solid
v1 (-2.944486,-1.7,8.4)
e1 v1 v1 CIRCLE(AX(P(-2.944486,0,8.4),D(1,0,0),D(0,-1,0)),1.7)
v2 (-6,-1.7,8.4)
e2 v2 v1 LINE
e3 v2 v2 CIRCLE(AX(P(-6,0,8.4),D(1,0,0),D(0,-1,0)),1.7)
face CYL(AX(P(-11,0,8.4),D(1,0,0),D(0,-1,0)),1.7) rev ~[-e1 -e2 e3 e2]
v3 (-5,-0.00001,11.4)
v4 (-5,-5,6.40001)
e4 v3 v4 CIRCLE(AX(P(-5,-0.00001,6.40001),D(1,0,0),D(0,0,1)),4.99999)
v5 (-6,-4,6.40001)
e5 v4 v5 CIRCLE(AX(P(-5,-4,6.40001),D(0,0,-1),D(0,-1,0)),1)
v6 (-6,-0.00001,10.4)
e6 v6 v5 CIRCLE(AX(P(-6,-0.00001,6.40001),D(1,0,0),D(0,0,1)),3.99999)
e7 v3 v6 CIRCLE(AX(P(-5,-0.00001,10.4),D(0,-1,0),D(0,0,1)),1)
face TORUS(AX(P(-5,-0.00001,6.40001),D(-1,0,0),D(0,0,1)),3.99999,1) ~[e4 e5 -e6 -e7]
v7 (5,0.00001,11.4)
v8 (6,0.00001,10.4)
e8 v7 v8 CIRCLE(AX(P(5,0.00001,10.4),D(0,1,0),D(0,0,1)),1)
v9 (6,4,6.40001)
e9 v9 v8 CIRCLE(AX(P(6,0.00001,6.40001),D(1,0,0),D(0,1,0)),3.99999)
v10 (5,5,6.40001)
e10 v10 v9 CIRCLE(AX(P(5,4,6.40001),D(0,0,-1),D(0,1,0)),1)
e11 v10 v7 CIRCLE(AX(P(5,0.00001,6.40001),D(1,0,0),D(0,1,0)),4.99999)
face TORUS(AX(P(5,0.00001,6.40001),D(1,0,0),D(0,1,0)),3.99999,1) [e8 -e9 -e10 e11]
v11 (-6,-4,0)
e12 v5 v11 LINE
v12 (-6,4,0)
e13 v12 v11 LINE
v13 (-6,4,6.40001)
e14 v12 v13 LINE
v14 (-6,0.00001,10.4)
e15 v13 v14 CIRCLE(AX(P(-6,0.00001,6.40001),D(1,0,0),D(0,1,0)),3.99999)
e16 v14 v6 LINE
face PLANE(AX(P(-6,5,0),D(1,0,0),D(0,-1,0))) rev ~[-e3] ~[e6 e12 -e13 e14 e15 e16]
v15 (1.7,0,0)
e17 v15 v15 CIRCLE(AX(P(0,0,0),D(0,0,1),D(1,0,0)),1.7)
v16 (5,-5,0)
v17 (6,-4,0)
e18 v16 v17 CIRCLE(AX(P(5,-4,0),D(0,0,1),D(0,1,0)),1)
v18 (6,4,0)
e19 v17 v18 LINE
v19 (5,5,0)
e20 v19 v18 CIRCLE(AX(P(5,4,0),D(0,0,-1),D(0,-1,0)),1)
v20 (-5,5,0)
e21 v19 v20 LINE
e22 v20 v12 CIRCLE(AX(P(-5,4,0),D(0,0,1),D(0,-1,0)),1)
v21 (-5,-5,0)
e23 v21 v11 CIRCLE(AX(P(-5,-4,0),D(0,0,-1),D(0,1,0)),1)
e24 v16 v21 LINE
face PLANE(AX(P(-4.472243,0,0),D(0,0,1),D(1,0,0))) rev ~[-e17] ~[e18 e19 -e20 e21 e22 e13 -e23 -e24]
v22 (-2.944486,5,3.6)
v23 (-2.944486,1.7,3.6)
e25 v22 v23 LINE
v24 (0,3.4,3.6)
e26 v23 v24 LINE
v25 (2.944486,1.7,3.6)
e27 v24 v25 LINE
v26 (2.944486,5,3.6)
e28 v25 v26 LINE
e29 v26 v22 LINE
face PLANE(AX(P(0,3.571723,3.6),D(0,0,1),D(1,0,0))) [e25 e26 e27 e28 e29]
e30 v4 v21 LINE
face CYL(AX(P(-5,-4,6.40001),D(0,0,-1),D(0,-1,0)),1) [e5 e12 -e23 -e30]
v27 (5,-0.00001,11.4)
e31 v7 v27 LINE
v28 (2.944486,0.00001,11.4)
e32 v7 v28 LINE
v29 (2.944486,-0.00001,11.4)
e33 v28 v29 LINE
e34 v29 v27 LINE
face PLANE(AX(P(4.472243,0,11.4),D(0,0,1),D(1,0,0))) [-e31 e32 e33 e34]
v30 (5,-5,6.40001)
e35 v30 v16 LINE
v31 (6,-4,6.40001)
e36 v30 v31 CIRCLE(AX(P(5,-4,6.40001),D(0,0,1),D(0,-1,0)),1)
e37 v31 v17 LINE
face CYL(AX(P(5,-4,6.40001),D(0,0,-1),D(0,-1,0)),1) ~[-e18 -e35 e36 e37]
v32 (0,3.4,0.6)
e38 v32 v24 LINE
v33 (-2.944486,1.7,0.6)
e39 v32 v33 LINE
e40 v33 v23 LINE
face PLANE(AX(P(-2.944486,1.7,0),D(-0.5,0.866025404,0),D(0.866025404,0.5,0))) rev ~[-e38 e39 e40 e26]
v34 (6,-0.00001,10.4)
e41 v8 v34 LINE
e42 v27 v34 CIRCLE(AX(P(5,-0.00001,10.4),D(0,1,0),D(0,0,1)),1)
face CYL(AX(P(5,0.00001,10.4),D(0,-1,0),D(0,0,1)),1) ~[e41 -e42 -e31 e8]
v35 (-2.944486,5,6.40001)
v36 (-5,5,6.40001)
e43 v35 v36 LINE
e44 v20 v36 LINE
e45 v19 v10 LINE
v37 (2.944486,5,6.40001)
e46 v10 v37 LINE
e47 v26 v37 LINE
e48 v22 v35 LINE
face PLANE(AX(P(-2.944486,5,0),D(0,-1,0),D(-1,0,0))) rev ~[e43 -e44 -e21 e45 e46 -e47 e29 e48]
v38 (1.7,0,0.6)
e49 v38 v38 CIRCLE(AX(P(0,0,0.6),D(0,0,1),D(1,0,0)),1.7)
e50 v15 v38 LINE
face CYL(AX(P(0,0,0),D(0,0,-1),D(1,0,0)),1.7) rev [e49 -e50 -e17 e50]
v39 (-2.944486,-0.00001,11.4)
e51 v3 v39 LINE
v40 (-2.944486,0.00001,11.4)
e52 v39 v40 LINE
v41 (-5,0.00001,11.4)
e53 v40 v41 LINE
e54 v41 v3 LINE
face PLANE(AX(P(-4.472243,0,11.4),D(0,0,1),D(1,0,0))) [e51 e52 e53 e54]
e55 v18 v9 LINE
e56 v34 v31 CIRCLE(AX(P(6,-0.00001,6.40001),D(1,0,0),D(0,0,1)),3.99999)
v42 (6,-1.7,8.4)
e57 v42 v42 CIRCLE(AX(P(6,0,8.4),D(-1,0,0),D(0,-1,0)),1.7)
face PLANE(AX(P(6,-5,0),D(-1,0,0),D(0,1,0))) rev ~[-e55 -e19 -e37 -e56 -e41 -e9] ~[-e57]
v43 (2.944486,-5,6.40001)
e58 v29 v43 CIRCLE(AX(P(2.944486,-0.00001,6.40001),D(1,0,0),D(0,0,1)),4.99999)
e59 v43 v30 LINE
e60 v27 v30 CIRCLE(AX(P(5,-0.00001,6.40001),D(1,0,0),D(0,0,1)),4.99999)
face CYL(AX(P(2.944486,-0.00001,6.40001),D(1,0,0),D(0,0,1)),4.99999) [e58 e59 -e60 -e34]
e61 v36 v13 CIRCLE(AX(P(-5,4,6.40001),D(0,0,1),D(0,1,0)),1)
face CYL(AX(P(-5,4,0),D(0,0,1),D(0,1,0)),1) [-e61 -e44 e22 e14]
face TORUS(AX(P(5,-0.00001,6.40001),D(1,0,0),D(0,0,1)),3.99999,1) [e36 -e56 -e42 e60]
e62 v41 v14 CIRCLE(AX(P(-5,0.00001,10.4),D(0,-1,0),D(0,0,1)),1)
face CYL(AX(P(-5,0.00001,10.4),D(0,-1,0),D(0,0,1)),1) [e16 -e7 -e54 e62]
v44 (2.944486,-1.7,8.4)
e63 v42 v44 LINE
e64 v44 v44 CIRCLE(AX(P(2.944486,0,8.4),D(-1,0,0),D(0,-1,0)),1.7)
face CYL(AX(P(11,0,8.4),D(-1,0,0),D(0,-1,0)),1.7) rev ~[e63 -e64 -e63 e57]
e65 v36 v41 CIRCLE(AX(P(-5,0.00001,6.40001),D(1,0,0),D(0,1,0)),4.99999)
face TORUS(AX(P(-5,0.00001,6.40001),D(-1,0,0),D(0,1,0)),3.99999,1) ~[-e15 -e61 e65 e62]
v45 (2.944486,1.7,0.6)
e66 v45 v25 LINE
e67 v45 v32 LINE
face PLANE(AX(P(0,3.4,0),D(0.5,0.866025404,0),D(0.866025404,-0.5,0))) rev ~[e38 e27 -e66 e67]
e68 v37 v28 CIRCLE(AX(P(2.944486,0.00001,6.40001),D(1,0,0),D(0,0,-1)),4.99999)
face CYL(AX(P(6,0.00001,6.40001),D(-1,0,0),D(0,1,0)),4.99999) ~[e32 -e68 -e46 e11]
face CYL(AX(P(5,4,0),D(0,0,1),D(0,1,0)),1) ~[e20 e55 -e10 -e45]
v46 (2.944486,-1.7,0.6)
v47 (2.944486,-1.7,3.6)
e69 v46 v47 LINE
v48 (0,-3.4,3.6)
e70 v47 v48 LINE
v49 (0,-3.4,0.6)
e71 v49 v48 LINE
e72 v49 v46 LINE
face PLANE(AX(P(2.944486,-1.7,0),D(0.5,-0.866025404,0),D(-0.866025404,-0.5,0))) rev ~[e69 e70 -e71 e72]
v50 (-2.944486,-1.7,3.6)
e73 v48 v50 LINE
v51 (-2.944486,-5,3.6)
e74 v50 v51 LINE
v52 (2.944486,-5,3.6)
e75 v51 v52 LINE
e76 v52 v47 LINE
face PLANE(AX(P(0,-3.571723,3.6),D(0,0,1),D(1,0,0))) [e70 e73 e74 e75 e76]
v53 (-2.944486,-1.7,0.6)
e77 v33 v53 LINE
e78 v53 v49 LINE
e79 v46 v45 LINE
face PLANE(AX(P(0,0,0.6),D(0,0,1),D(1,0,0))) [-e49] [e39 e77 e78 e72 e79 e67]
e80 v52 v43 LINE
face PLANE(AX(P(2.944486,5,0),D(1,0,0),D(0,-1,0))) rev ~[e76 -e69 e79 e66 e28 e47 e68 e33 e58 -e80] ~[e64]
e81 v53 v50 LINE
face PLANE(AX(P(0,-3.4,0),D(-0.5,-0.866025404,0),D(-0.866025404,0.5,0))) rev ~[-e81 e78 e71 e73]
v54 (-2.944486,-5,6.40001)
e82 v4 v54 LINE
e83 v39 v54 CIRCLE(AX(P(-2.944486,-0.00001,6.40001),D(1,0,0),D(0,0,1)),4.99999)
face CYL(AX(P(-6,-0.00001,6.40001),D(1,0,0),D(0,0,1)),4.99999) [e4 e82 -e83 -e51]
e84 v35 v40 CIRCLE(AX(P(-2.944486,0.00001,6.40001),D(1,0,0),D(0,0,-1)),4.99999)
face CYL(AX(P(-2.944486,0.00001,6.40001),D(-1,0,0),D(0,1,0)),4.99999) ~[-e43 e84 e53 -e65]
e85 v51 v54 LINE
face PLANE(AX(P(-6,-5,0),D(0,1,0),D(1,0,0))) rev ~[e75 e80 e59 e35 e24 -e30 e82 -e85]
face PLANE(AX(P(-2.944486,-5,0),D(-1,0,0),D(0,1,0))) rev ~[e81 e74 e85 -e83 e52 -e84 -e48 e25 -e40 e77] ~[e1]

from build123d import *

# Parameters (mm, degrees)
F0_R     = 1.7
F5_DEPTH = 0.6
F6_DEPTH = 3.6
F7_DEPTH = 11.4
F8_D     = 3.4
F8_DEPTH = 5
F8_START = 1
F8_TIP   = 1.0214630523
F9_D     = 3.4
F9_DEPTH = 5
F9_START = 1
F9_TIP   = 1.0214630523
F10_R    = 4.99999
F11_R    = 1


# Not quite as in the source:
# - a fillet or chamfer is up to 0.001 mm smaller than in the source, because OpenCascade refuses the exact size


with BuildPart() as f5:
    # F0 (on Top) → F5 (new body)
    with BuildSketch(Plane.XY):
        Polygon((0, 3.4), (-2.9444863729, 1.7), (-2.9444863729, -1.7), (0, -3.4), (2.9444863729, -1.7), (2.9444863729, 1.7), align=None)
        Circle(F0_R, mode=Mode.SUBTRACT)
    extrude(amount=F5_DEPTH)

    # F0 (on Top) → F6 (join)
    with BuildSketch(Plane.XY):
        Polygon((2.9444863729, 5), (-2.9444863729, 5), (-2.9444863729, 1.7), (0, 3.4), (2.9444863729, 1.7), align=None)
        Polygon((-2.9444863729, -1.7), (-2.9444863729, -5), (2.9444863729, -5), (2.9444863729, -1.7), (0, -3.4), align=None)
    extrude(amount=F6_DEPTH)

    # F0 (on Top) → F7 (join)
    with BuildSketch(Plane.XY):
        Polygon((-2.9444863729, 5), (-6, 5), (-6, -5), (-2.9444863729, -5), (-2.9444863729, -1.7), (-2.9444863729, 1.7), align=None)
        Polygon((6, 5), (2.9444863729, 5), (2.9444863729, 1.7), (2.9444863729, -1.7), (2.9444863729, -5), (6, -5), align=None)
    extrude(amount=F7_DEPTH)

    # F8
    # its depths count from where the whole tool has entered the part; down to there all is cleared
    with Locations(Plane(origin=(-7, 0, 0), x_dir=(0, 1, 0), z_dir=(-1, 0, 0)).offset(-F8_START)):
        with Locations((0, -8.4)):
            Hole(F8_D / 2, depth=F8_DEPTH)
            with Locations((0, 0, -(F8_DEPTH + F8_TIP / 2))):  # 118° drill point
                Cone(0, F8_D / 2, F8_TIP, mode=Mode.SUBTRACT)

    # F9
    # its depths count from where the whole tool has entered the part; down to there all is cleared
    with Locations(Plane.YZ.offset(7).offset(-F9_START)):
        with Locations((0, 8.4)):
            Hole(F9_D / 2, depth=F9_DEPTH)
            with Locations((0, 0, -(F9_DEPTH + F9_TIP / 2))):  # 118° drill point
                Cone(0, F9_D / 2, F9_TIP, mode=Mode.SUBTRACT)

    # F10 (radius 5 in the source; OpenCascade refuses exactly that, so slightly less here)
    f10_edges = [f5.edges().sort_by_distance(p)[0] for p in [
        (-4.472243, -5, 11.4),
        (-4.472243, 5, 11.4),
        (4.472243, 5, 11.4),
        (4.472243, -5, 11.4),
    ]]
    fillet(f10_edges, radius=F10_R)

    # F11
    f11_edges = [f5.edges().sort_by_distance(p)[0] for p in [
        (6, 3.535537, 9.935537),
        (-6, 3.535537, 9.935537),
    ]]
    fillet(f11_edges, radius=F11_R)


solid = f5.part
